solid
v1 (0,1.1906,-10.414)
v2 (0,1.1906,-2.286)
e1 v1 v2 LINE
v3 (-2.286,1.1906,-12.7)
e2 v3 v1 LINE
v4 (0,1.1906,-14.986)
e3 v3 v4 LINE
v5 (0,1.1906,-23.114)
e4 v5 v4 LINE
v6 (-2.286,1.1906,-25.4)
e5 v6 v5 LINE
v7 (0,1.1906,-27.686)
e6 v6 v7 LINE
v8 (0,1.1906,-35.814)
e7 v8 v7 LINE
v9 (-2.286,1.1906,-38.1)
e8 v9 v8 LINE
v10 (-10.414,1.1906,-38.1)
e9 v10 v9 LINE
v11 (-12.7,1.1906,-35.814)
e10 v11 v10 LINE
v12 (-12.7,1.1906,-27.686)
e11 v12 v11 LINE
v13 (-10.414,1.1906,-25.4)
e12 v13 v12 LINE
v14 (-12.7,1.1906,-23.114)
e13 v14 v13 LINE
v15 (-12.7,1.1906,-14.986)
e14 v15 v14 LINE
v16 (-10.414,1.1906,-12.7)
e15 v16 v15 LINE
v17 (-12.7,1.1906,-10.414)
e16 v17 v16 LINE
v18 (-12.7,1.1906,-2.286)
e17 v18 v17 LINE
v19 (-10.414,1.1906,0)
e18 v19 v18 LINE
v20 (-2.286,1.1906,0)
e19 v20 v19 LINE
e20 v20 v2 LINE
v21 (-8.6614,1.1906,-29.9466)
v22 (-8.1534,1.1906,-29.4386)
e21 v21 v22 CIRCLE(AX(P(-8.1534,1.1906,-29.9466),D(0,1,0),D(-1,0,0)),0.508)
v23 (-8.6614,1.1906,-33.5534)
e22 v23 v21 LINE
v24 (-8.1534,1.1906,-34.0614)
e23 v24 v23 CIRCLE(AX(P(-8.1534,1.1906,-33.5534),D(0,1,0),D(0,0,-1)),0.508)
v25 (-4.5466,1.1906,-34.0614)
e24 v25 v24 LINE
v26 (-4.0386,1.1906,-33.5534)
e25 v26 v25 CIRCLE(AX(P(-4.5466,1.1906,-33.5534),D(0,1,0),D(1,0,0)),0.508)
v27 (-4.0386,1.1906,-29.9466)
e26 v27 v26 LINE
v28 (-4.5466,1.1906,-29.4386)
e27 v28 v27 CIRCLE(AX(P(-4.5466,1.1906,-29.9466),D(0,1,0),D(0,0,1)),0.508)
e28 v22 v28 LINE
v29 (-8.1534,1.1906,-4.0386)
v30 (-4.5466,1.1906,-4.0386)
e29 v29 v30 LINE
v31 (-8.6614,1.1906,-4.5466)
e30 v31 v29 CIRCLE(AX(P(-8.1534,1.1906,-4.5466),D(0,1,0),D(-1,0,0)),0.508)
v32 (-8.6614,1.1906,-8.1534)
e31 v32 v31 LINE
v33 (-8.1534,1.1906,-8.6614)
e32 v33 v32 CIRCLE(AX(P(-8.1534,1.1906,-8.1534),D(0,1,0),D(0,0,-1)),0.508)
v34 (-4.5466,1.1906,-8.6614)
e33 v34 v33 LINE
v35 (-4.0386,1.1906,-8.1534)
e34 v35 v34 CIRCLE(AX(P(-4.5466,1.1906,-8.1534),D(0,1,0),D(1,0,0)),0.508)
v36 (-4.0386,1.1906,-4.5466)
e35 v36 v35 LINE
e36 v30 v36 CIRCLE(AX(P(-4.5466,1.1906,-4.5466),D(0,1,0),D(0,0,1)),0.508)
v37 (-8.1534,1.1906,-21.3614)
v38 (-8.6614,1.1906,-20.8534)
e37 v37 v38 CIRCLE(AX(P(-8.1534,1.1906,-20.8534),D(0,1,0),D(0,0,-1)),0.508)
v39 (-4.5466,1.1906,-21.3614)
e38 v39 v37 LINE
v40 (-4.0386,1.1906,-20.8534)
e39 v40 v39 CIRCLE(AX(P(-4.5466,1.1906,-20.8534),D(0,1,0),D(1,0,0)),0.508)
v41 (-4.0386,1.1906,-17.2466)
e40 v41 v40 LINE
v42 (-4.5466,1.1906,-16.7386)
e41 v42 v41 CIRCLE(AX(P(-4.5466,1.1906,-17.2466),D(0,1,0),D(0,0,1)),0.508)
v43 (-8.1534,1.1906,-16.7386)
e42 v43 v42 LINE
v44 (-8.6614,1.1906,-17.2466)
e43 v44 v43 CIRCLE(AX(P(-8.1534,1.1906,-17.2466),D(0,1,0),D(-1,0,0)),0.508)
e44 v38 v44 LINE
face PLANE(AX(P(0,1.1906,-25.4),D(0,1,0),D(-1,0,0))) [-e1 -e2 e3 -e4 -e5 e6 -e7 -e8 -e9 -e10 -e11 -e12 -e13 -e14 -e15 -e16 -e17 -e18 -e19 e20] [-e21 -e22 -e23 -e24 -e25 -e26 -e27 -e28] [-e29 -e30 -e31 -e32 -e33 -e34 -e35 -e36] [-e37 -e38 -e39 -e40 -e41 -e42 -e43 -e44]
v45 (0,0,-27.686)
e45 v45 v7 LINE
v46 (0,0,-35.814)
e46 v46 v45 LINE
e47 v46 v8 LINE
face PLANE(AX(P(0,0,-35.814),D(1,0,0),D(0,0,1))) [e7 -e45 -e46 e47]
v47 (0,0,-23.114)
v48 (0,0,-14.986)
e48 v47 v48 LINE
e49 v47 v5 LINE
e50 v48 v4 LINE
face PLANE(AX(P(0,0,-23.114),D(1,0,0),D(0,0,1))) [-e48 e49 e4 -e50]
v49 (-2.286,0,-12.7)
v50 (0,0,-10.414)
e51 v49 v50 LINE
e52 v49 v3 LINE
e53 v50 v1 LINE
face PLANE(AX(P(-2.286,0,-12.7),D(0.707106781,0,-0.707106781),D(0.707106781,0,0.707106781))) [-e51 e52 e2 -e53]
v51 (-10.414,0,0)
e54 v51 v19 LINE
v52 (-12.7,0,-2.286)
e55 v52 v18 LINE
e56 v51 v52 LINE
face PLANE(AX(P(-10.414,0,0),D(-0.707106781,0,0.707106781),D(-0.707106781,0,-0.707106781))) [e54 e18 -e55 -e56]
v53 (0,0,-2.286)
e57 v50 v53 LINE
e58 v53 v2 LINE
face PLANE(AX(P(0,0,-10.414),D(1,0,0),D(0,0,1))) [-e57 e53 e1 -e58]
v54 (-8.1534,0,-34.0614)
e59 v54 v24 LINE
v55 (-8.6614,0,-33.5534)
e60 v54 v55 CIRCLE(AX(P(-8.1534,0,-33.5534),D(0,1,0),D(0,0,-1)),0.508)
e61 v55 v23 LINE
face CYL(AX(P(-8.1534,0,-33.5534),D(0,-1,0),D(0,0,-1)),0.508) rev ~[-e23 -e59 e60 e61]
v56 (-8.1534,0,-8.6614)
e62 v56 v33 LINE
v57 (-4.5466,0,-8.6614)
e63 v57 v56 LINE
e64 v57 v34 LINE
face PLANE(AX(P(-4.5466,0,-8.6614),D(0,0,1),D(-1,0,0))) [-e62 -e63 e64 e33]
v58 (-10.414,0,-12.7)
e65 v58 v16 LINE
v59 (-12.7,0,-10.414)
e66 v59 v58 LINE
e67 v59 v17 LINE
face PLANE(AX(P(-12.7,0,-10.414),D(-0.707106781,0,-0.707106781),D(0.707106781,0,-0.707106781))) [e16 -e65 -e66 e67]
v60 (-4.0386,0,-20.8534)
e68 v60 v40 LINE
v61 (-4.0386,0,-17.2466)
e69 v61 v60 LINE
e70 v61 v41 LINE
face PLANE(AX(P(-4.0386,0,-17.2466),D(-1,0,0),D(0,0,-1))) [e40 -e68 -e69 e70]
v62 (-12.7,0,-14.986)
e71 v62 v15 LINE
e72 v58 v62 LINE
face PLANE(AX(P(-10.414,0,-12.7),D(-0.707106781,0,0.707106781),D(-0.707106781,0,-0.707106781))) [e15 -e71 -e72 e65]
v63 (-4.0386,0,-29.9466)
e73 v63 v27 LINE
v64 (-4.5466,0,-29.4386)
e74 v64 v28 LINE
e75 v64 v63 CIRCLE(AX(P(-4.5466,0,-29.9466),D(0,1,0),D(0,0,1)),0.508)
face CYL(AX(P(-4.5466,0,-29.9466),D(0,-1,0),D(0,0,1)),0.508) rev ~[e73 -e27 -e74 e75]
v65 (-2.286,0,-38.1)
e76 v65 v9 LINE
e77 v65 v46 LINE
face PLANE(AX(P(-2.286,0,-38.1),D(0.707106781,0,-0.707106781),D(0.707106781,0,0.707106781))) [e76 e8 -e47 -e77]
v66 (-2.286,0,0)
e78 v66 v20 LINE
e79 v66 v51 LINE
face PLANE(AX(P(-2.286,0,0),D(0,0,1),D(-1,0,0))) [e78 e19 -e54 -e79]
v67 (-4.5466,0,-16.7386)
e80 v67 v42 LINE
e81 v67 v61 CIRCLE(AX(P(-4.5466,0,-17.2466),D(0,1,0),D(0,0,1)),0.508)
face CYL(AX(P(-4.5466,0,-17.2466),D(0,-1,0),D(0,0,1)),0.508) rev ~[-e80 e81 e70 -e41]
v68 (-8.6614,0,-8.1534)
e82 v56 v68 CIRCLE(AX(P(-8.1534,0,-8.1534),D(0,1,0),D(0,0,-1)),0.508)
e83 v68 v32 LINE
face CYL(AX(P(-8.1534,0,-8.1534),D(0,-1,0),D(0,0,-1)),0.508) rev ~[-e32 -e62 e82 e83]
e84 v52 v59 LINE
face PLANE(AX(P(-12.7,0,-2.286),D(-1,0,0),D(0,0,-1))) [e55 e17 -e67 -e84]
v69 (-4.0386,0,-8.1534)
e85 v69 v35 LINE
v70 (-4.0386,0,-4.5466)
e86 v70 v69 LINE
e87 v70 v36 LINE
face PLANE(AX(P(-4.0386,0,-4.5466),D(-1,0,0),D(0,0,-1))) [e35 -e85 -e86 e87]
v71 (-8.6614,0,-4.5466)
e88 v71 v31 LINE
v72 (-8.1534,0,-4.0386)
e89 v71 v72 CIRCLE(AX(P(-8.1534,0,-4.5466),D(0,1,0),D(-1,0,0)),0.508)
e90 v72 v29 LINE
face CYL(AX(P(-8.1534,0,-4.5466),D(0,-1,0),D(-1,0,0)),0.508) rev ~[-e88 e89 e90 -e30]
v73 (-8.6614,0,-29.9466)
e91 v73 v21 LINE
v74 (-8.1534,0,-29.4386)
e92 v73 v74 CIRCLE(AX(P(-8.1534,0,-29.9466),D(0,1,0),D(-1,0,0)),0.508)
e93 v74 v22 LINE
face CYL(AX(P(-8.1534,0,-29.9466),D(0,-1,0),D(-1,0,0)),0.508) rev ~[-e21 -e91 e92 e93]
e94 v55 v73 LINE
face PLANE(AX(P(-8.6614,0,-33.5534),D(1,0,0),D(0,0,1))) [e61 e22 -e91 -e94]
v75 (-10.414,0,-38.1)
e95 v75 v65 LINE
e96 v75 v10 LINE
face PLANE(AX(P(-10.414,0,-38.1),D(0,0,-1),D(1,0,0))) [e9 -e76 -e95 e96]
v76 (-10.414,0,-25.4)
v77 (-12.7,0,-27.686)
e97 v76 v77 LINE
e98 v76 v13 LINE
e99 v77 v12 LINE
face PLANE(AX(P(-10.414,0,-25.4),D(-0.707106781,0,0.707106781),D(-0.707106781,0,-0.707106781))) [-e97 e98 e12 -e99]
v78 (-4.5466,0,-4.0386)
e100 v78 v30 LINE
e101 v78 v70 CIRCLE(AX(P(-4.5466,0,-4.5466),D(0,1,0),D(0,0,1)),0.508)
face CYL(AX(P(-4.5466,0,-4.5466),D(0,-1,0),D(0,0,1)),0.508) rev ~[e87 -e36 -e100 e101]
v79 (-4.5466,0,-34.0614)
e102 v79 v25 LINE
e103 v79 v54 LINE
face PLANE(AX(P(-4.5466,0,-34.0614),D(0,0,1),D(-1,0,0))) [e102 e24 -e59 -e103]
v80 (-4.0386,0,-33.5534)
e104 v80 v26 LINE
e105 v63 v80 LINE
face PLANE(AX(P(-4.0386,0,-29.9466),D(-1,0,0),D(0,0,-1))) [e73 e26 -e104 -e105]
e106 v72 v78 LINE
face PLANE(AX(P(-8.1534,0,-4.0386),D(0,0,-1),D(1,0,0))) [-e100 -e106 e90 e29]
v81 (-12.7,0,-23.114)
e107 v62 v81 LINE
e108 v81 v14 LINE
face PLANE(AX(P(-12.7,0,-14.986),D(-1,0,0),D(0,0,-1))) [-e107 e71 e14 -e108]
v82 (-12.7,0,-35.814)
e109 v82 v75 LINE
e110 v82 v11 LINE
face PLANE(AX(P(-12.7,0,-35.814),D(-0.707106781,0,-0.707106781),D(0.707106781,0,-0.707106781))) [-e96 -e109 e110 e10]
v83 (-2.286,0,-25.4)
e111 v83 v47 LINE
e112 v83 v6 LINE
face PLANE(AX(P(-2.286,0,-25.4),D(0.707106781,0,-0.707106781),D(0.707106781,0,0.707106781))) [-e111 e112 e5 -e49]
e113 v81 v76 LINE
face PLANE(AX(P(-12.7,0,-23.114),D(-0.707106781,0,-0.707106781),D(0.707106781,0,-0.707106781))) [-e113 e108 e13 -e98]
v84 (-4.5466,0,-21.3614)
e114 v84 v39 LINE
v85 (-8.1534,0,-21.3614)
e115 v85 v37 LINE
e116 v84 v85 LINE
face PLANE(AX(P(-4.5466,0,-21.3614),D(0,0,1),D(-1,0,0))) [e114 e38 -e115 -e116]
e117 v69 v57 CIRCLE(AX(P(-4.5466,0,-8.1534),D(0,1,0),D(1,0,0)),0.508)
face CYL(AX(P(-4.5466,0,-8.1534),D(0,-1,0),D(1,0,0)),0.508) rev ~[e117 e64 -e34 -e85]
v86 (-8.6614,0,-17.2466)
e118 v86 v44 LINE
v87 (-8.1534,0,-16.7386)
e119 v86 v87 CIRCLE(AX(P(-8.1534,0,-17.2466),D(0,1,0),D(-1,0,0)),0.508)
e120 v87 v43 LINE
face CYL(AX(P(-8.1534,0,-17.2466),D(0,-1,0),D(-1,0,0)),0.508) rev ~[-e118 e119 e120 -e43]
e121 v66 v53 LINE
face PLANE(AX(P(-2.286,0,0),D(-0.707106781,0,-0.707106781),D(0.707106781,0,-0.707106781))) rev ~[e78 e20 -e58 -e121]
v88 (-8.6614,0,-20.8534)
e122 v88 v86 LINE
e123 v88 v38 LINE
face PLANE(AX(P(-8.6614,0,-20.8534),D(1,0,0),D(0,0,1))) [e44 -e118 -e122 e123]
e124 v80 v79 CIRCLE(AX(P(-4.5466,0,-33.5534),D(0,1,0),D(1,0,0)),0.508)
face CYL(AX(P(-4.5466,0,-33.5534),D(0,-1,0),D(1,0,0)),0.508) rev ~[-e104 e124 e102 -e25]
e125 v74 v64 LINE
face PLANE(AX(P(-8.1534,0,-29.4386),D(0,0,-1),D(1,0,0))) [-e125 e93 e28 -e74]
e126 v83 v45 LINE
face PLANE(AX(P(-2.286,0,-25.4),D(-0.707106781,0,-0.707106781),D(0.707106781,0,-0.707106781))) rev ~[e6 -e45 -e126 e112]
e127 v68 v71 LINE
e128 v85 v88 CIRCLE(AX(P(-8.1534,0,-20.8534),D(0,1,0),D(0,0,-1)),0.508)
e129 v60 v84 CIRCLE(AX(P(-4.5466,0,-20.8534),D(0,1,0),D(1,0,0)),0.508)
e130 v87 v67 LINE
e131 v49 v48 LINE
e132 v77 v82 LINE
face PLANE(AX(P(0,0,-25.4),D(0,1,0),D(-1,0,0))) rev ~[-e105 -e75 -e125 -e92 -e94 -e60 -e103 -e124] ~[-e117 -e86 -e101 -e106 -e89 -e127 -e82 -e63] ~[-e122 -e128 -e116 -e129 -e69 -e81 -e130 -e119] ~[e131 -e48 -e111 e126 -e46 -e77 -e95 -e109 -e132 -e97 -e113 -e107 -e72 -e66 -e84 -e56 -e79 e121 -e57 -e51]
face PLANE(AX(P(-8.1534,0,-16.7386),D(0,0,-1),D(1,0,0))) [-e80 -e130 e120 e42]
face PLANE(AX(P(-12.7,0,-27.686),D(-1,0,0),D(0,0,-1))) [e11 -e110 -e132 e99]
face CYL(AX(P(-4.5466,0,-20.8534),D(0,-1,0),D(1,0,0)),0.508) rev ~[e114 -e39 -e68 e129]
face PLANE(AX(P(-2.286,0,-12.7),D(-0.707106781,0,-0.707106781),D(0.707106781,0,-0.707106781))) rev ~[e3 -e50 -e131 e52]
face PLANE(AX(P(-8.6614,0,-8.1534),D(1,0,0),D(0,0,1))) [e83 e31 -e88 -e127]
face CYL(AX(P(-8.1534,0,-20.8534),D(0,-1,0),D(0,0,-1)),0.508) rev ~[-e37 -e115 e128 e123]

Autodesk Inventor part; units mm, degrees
ref_plane "YZ Plane" through (0, 0, 0) normal (1, 0, 0) x (0, 1, 0)
ref_plane "XZ Plane" through (0, 0, 0) normal (0, 1, 0) x (-1, 0, 0)
ref_plane "XY Plane" through (0, 0, 0) normal (0, 0, 1) x (1, 0, 0)
sketch "Sketch1" plane through (0, 0, 0) normal (0, 1, 0) x (-1, 0, 0)
  line L0 (2.286, 0) -> (10.414, 0)
  line L1 (12.7, -2.286) -> (12.7, -10.414)
  line L2 (10.414, -12.7) -> (2.286, -12.7)
  line L3 (0, -10.414) -> (0, -2.286)
  line L4 (8.1534, -4.0386) -> (4.5466, -4.0386)
  line L5 (4.0386, -4.5466) -> (4.0386, -8.1534)
  line L6 (4.5466, -8.6614) -> (8.1534, -8.6614)
  line L7 (8.6614, -8.1534) -> (8.6614, -4.5466)
  line L8 (10.414, 0) -> (12.7, -2.286)
  line L9 (12.7, -10.414) -> (10.414, -12.7)
  line L10 (2.286, -12.7) -> (0, -10.414)
  line L11 (2.286, 0) -> (0, -2.286)
  arc A0 (8.6614, -4.5466) -> (8.1534, -4.0386) centre (8.1534, -4.5466) ccw
  arc A1 (8.1534, -8.6614) -> (8.6614, -8.1534) centre (8.1534, -8.1534) ccw
  arc A2 (4.0386, -8.1534) -> (4.5466, -8.6614) centre (4.5466, -8.1534) ccw
  arc A3 (4.5466, -4.0386) -> (4.0386, -4.5466) centre (4.5466, -4.5466) ccw
  line L12 (8.1534, -4.5466) -> (4.5466, -8.1534) construction
  line L13 (12.7, -10.414) -> (0, -2.286) construction
  point P0 (0, 0)
  point P1 (12.7, -12.7)
  point P2 (12.7, 0)
  point P3 (0, -12.7)
  point P4 (4.0386, -8.6614)
  point P5 (8.6614, -8.6614)
  point P6 (6.35, -6.35)
  dimension "d1" = 12.7
  dimension "d2" = 4.6228
  dimension "d3" = 2.286
  dimension "d4" = 2.286
  dimension "d5" = 2.286
  dimension "d6" = 2.286
  dimension "d7" = 2.286
  dimension "d8" = 2.286
  dimension "d9" = 2.286
  dimension "d10" = 2.286
  dimension "d11" = 0.508
extrude "Body" add sketch "Sketch1" along normal blind 1.1906
sketch "Sketch2" plane through (0, 1.1906, 0) normal (0, 1, 0) x (1, 0, 0)
  arc A0 (-8.1534, 8.6614) -> (-8.6614, 8.1534) centre (-8.1534, 8.1534) ccw construction
  arc A1 (-4.5466, 4.0386) -> (-4.0386, 4.5466) centre (-4.5466, 4.5466) ccw construction
  circle A2 centre (-6.35, 6.35) radius 2.1844
  line L0 (-8.1534, 8.1534) -> (-4.5466, 4.5466) construction
  point P0 (0, 0)
  dimension "d14" = 4.3688
surface extrude "Circle" sketch "Sketch2" against normal up to surface (1.1906 mm away) shown yes curves A2
pattern_linear "Rectangular Pattern1" count 3 spacing 12.7 along (0, 0, -1) of "Body", "Circle"
equation "\"d4\" = d3"
equation "\"d5\" = d3"
equation "\"d6\" = d5"
equation "\"d7\" = d3"
equation "\"d8\" = d7"
equation "\"d9\" = d3"
equation "\"d10\" = d9"
equation "\"d22\" = d19"
equation "\"d19\" = 12.7"
